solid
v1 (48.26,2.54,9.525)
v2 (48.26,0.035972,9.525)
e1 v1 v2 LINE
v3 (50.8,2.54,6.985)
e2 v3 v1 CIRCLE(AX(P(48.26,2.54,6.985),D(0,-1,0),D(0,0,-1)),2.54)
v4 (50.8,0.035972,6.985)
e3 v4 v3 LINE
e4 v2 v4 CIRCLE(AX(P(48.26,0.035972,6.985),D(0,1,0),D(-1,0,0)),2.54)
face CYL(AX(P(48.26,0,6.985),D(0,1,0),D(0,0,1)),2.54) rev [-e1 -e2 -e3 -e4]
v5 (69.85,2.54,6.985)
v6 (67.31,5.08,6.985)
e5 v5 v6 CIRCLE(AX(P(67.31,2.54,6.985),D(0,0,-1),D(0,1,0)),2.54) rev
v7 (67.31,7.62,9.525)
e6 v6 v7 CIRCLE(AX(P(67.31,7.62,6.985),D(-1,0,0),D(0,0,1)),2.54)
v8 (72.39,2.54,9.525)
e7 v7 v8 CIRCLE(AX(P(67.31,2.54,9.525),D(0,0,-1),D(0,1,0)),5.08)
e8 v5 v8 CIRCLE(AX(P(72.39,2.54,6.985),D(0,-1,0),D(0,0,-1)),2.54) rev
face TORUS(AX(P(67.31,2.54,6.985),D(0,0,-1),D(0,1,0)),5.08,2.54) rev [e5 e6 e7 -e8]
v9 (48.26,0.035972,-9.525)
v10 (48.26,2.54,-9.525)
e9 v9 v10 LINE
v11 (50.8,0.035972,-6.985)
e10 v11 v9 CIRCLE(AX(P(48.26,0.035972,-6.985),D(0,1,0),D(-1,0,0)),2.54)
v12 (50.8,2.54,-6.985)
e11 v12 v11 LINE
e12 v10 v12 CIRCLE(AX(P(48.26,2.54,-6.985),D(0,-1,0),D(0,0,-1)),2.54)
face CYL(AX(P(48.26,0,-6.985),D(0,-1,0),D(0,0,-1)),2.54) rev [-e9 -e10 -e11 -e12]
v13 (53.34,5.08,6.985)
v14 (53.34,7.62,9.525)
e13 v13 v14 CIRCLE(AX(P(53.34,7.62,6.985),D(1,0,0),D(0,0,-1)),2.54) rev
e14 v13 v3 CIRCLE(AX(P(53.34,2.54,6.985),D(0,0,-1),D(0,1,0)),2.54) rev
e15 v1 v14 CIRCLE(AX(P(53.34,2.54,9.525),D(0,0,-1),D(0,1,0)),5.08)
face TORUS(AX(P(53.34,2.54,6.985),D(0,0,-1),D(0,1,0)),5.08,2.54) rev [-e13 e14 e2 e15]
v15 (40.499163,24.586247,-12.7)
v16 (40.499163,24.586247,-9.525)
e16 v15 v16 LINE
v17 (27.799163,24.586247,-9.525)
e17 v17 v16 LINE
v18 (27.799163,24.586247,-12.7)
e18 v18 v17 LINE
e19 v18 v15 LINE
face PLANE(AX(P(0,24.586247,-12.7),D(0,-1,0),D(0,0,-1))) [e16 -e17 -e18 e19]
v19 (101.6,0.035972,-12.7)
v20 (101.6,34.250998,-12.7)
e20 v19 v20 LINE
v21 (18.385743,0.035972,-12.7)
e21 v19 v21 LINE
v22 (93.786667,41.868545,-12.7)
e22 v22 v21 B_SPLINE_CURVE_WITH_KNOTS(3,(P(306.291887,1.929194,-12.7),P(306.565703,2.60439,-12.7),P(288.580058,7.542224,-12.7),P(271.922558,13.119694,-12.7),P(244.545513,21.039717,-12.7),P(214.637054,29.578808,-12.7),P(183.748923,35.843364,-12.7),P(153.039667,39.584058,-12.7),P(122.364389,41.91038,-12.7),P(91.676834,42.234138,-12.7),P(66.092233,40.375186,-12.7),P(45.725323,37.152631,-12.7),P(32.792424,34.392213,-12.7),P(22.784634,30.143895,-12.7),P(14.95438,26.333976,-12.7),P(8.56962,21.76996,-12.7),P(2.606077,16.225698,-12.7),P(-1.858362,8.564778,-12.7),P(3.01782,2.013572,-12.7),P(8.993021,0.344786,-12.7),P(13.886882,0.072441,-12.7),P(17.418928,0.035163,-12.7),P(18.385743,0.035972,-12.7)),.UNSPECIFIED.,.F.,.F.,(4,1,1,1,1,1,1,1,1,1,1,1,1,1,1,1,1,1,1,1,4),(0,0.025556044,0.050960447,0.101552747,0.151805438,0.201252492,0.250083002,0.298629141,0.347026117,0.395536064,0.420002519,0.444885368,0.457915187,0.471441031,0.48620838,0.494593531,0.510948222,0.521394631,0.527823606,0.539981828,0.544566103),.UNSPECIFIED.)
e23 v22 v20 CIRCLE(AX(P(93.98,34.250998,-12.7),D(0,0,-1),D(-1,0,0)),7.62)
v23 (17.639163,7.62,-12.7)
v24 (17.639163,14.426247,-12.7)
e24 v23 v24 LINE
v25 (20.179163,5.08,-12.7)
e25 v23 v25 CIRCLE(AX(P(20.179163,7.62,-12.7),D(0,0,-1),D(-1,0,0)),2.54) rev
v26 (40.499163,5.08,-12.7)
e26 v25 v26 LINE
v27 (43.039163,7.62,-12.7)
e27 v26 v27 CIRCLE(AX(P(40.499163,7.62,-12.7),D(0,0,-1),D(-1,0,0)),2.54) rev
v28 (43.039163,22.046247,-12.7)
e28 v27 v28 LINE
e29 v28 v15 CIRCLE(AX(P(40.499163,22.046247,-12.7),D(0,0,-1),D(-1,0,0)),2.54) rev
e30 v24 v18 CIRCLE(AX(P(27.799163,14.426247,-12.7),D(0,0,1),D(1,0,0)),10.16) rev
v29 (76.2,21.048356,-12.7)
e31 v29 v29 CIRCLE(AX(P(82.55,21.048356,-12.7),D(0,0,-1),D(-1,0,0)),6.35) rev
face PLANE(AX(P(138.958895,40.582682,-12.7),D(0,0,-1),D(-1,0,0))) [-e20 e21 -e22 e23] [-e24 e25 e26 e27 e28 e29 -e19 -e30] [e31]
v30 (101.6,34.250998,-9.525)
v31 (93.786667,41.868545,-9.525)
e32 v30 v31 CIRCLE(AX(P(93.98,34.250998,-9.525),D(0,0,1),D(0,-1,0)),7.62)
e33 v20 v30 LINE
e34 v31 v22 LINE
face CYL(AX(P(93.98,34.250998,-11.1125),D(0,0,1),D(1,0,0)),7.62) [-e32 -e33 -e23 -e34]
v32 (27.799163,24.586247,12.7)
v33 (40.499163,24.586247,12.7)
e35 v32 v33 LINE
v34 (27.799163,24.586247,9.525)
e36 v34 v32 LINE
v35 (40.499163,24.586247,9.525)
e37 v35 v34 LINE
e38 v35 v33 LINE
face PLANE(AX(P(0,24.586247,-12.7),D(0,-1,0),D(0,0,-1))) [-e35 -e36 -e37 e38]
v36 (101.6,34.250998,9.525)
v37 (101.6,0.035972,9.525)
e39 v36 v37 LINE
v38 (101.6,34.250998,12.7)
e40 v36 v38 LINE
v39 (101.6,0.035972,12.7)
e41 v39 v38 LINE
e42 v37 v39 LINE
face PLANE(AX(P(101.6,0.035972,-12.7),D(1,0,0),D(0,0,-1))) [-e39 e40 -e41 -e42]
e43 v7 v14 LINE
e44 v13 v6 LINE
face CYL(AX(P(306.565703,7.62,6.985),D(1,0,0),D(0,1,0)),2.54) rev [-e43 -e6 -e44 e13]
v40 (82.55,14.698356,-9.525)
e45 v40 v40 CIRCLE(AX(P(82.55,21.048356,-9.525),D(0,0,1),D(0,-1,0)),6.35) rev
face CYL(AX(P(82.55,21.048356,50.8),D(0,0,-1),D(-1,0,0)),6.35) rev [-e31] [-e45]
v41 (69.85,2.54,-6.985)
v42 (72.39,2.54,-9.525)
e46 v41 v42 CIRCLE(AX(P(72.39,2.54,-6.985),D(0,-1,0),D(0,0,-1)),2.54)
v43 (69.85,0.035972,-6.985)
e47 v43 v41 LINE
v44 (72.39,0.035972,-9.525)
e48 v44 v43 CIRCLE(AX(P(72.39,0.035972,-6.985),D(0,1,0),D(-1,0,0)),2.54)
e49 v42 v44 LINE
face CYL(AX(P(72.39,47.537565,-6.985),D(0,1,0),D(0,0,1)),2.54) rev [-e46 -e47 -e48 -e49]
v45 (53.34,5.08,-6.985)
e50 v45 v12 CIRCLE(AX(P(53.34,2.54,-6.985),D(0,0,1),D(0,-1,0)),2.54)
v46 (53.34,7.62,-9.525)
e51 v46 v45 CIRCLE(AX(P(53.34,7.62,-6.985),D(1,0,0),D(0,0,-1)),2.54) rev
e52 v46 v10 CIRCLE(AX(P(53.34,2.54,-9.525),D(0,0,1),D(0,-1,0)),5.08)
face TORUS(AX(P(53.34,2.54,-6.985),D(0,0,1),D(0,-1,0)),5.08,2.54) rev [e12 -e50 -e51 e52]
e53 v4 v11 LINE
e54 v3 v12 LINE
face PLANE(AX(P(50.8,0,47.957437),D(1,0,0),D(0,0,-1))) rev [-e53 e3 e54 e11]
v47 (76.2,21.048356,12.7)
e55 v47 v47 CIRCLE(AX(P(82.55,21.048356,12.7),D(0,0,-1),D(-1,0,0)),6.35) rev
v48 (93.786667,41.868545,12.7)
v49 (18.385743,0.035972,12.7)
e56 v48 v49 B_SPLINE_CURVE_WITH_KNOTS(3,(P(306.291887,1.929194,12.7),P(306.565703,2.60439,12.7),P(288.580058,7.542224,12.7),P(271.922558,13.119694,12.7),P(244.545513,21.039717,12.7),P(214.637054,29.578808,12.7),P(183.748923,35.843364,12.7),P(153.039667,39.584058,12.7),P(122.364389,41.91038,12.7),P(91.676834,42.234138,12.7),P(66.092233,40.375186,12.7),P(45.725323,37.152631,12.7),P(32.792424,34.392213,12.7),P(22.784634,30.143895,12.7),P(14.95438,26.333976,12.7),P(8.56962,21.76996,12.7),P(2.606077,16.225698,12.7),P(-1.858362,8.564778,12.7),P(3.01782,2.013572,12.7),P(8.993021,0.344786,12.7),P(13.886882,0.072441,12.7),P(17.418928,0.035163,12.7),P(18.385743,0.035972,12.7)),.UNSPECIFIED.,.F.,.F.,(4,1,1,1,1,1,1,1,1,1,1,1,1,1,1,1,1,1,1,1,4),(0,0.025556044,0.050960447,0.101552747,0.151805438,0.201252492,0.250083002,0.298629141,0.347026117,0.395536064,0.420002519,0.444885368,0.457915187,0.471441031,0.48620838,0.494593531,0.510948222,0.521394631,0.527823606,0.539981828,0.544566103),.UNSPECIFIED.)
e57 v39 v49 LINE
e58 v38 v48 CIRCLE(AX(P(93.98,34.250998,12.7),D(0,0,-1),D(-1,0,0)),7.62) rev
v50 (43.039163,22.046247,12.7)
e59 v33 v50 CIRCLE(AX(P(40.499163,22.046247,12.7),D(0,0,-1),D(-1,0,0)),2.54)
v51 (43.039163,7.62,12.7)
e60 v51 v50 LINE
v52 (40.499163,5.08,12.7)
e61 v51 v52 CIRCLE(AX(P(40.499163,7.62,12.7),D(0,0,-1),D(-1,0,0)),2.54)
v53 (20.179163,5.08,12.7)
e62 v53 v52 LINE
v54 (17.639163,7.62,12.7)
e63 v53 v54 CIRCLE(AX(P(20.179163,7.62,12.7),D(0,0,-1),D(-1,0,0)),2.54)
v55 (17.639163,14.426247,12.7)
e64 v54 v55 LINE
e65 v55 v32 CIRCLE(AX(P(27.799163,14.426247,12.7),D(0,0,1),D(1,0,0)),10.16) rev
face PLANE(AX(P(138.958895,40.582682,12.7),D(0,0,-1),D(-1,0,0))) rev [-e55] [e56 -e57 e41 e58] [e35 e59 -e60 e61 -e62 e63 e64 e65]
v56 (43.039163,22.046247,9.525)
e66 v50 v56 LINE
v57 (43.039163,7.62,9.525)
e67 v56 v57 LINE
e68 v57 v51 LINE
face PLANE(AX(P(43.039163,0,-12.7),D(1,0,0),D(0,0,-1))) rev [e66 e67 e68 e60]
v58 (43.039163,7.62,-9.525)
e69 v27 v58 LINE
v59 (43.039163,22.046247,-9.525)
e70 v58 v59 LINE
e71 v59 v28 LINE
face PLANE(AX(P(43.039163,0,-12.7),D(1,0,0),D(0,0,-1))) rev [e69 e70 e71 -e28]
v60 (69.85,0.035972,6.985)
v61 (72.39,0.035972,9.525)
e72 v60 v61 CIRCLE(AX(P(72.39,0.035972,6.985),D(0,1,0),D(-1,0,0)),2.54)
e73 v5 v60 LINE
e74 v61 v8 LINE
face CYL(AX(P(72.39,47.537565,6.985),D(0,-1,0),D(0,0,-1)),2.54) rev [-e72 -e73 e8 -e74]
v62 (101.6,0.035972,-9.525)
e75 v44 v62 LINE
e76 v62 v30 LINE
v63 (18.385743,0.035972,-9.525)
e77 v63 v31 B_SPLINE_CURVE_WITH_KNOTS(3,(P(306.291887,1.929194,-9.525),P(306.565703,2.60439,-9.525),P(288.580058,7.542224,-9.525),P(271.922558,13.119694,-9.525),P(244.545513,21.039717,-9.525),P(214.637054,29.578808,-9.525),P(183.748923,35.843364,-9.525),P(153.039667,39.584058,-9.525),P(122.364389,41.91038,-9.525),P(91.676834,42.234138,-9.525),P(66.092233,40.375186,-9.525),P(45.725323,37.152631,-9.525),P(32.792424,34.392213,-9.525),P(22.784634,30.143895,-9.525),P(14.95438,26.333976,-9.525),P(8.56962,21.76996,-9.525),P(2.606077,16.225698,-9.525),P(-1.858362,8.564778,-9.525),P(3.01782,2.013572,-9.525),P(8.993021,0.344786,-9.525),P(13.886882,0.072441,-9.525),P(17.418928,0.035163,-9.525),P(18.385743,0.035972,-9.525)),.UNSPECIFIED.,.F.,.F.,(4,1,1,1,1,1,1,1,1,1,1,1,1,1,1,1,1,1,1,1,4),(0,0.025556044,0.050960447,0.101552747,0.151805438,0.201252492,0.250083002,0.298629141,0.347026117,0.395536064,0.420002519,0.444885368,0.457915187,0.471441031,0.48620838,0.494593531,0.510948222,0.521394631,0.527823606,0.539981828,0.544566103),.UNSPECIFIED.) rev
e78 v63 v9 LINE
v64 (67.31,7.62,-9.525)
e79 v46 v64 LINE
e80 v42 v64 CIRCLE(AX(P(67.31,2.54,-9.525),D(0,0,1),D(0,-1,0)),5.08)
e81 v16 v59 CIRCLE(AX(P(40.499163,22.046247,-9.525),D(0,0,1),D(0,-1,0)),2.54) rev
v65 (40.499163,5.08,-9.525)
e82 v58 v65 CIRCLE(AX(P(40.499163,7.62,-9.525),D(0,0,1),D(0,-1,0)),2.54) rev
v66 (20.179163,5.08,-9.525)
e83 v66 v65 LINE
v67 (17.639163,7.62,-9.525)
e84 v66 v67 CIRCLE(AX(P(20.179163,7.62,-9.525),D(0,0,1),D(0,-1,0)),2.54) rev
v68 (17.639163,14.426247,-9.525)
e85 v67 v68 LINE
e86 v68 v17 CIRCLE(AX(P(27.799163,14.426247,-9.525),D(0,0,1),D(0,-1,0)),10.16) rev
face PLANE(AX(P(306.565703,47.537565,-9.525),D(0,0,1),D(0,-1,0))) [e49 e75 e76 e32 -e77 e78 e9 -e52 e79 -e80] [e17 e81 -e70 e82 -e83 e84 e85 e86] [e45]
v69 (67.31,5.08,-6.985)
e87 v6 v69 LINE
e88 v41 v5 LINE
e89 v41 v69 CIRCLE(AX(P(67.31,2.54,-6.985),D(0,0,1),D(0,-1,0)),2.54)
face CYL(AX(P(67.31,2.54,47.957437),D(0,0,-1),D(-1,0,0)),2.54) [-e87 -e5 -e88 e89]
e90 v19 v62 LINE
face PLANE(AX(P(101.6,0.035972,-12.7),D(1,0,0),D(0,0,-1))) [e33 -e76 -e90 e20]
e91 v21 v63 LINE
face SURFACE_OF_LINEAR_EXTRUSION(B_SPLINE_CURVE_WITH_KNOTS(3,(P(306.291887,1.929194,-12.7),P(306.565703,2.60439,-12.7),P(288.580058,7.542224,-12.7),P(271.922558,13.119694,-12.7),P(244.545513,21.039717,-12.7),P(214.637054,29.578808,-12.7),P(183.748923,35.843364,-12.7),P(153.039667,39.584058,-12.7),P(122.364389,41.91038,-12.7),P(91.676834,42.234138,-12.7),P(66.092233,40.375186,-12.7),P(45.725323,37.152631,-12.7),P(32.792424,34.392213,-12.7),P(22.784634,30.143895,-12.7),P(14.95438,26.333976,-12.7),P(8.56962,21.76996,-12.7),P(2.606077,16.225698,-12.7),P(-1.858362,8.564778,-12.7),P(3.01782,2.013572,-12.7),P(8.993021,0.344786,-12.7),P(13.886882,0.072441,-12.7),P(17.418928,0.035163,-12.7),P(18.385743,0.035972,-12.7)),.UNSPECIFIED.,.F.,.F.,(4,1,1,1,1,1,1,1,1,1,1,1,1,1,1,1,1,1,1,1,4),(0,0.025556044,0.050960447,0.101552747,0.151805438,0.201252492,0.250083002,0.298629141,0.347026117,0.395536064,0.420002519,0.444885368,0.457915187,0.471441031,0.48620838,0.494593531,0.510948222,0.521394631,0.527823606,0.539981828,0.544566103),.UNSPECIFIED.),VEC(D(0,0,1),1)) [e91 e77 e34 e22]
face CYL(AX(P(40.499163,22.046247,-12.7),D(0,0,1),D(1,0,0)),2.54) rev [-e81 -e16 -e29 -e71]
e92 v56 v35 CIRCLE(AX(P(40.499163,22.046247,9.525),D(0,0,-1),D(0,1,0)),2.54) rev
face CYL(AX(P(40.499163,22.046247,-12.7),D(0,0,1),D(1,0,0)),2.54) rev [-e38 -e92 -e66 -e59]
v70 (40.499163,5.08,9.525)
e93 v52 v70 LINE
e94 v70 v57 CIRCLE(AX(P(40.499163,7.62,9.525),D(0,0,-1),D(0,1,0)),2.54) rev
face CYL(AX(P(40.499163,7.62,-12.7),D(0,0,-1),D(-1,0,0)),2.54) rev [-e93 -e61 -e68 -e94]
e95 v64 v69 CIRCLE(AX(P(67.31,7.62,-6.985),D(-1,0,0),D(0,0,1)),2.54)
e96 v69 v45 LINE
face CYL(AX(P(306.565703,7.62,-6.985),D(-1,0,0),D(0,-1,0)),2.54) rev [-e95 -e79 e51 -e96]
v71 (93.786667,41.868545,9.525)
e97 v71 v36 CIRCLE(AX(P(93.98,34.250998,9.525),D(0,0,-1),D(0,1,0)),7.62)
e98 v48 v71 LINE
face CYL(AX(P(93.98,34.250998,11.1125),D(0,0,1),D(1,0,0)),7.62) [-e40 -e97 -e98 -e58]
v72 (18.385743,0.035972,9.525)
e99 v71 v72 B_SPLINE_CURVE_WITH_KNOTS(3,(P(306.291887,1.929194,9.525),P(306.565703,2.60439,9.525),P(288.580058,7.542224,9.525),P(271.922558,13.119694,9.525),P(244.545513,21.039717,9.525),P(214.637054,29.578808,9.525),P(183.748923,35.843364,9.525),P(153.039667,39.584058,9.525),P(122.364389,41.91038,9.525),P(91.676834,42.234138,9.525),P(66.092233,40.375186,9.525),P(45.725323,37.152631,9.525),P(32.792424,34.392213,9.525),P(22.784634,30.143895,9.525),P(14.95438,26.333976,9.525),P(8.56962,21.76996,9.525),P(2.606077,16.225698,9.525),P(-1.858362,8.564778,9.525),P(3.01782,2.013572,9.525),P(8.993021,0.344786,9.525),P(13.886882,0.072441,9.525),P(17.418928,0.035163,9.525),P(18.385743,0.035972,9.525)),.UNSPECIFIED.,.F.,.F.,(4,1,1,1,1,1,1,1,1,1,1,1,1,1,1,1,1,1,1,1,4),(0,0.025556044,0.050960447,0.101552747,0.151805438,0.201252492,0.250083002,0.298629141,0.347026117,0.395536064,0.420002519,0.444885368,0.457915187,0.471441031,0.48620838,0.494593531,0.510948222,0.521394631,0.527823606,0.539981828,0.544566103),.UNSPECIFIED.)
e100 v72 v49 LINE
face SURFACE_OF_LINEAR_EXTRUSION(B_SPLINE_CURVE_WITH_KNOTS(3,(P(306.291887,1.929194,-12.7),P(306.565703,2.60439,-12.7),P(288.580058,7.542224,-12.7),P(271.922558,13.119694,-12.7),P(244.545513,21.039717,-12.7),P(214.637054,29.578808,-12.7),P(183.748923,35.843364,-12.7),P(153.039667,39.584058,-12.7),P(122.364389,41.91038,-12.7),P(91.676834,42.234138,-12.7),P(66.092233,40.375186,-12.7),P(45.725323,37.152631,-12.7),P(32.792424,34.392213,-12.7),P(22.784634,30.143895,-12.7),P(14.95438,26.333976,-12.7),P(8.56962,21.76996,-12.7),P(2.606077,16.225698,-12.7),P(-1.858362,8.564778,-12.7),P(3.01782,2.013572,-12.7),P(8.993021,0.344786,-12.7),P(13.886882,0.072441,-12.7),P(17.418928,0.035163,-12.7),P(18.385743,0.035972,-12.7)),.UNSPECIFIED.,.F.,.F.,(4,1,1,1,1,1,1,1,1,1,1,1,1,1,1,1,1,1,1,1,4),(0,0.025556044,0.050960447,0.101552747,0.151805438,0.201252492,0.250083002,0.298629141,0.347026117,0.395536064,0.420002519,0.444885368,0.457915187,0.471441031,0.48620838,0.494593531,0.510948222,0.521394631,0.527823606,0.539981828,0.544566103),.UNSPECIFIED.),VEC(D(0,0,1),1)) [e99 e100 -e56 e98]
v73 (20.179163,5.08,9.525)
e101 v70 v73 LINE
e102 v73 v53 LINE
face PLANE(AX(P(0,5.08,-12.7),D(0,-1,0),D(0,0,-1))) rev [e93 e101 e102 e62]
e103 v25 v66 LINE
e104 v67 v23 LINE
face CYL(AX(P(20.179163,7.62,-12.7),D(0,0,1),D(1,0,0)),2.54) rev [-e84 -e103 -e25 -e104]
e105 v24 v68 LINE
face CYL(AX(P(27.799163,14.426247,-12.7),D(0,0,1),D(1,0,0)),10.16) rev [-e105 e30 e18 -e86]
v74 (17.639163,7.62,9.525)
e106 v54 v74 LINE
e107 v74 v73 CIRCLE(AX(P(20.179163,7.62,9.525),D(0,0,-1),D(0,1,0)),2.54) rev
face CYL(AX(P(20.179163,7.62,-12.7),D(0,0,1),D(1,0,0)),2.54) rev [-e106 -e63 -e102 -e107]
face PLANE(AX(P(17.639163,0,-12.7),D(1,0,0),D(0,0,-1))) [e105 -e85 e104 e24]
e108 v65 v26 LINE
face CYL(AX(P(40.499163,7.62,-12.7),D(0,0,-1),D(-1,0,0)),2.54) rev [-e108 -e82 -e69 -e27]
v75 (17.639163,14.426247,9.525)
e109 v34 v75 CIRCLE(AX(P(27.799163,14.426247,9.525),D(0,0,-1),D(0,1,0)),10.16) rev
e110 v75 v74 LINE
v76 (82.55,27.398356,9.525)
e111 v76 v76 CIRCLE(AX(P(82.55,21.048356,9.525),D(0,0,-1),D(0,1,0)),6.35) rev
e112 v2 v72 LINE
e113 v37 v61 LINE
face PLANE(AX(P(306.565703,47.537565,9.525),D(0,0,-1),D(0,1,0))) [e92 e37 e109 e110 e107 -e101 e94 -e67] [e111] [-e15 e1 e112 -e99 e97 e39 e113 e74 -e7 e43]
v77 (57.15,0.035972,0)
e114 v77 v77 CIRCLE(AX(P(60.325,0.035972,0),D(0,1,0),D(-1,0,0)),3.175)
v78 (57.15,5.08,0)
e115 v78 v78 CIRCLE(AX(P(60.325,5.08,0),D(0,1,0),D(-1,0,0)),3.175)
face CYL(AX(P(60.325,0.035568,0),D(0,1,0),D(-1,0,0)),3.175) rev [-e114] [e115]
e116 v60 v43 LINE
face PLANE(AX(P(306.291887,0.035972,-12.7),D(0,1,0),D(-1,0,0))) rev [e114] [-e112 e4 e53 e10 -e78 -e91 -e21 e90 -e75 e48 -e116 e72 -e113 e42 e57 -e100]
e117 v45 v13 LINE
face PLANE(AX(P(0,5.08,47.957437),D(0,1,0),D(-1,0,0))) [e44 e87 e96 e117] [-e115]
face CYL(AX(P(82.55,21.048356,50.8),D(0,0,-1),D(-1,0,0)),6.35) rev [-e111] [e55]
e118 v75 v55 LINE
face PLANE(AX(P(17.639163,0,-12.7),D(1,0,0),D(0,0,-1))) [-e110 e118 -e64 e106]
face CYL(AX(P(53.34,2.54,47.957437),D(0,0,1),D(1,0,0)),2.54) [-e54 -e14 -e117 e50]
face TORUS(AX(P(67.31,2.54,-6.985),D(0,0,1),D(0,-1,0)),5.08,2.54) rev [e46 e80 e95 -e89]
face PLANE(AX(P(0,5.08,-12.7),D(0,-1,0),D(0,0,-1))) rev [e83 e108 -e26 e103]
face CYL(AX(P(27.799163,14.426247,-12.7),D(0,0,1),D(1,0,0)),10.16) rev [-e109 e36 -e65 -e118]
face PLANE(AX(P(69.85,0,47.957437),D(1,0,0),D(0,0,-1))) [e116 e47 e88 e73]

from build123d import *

# Parameters (mm, degrees)
BOSS_EXTRUDE1_DEPTH      = 12.7
BOSS_EXTRUDE1_DEPTH_BACK = 12.7
SKETCH2_W                = 19.05
SKETCH2_H                = 49.651656102
CUT_EXTRUDE1_DEPTH       = 310.423757716
SKETCH3_W                = 38.1
SKETCH3_H                = 5.044027725
SKETCH3_W_2              = 19.05
BOSS_EXTRUDE2_DEPTH      = 19.05
CUT_EXTRUDE3_DEPTH       = 50.8
CUT_EXTRUDE3_DEPTH_BACK  = 50.8
SKETCH12_R               = 6.35
SKETCH12_R_2             = 3.175
SKETCH12_R_3             = 5
FILLET8_R                = 2.54
SKETCH13_W               = 213.045597148
SKETCH13_H               = 55.670329679
CUT_EXTRUDE4_DEPTH       = 311.204708703
FILLET9_START            = 9
FILLET9_DEPTH            = 5
FILLET10_START           = -14
FILLET10_DEPTH           = 5
CUT_EXTRUDE5_DEPTH       = 113.114633783
CUT_EXTRUDE5_DEPTH_BACK  = 113.114633783
FILLET11_R               = 2.54
SKETCH8_R                = 3.175
CUT_EXTRUDE2_DEPTH       = 109.799942755


with BuildPart() as part:
    # Sketch1 → Boss-Extrude1 (new, two sides: drawn at the far end of the back side and taken through both)
    with BuildSketch(Plane.XY.offset(-BOSS_EXTRUDE1_DEPTH_BACK)):
        with BuildLine():
            Line((306.2918866, 1.929193729), (306.2918866, 0.035972275))
            Line((306.2918866, 0.035972275), (18.385743088, 0.035972275))
            add(Edge.make_bspline(
                [(306.2918866, 1.929193729), (306.565703117, 2.60439044), (288.5800577, 7.542224382), (271.922557924, 13.119693618), (244.545512993, 21.039717296), (214.63705438, 29.578808281), (183.74892315, 35.843363942), (153.039666672, 39.584058053), (122.364389131, 41.910380286), (91.676834287, 42.234137684), (66.092232531, 40.375185886), (45.725322729, 37.15263137), (32.792424184, 34.392213233), (22.784634494, 30.143895353), (14.954380304, 26.333975955), (8.569620221, 21.769960087), (2.606076707, 16.225698301), (-1.858362456, 8.564778309), (3.017819974, 2.013571533), (8.993020993, 0.344786487), (13.886881629, 0.072440703), (17.418928388, 0.035163036), (18.385743088, 0.035972275)],
                knots=[0, 0, 0, 0, 0.025556044, 0.050960447, 0.101552747, 0.151805438, 0.201252492, 0.250083002, 0.298629141, 0.347026117, 0.395536064, 0.420002519, 0.444885368, 0.457915187, 0.471441031, 0.48620838, 0.494593531, 0.510948222, 0.521394631, 0.527823606, 0.539981828, 0.544566103, 0.544566103, 0.544566103, 0.544566103], degree=3))
        make_face()
    extrude(amount=BOSS_EXTRUDE1_DEPTH + BOSS_EXTRUDE1_DEPTH_BACK)

    # Sketch2 → Cut-Extrude1 (cut, through all)
    with BuildSketch(Plane(origin=(0, 0, 0), x_dir=(0, 0, -1), z_dir=(1, 0, 0))):
        with Locations((0, 22.711736939)):
            Rectangle(SKETCH2_W, SKETCH2_H)
    extrude(amount=CUT_EXTRUDE1_DEPTH, mode=Mode.SUBTRACT)


with BuildPart() as cut_extrude1_piece_1:
    # of the separate pieces the step leaves, piece 1, a body of its own (cut_extrude1_pieces)
    add(part.part.solids().sort_by_distance((306.2918866, 0.035972275, 9.525))[0])



with BuildPart() as cut_extrude1_piece_2:
    # of the separate pieces the step leaves, piece 2, a body of its own (cut_extrude1_pieces)
    add(part.part.solids().sort_by_distance((306.2918866, 1.929193729, -9.525))[0])


with BuildPart() as cut_extrude1_piece_1_1:
    add(cut_extrude1_piece_1.part)

    add(cut_extrude1_piece_2.part)  # Boss-Extrude2 merges Cut-Extrude1 piece 2
    # Sketch3 → Boss-Extrude2 (add)
    with BuildSketch(Plane.XY.offset(-9.525)):
        with Locations((190.372920526, 2.557986137)):
            Rectangle(SKETCH3_W, SKETCH3_H)
        with Locations((60.325, 2.557986137)):
            Rectangle(SKETCH3_W_2, SKETCH3_H)
    extrude(amount=BOSS_EXTRUDE2_DEPTH)

    # Sketch12 → Cut-Extrude3 (cut, two sides: drawn at the far end of the back side and taken through both)
    with BuildSketch(Plane.XY.offset(-CUT_EXTRUDE3_DEPTH_BACK)):
        with Locations(Location((82.55, 21.048356458, 0), (0, 0, 180))):
            Circle(SKETCH12_R)
        with Locations(Location((152.4, 21.048356458, 0), (0, 0, 180))):
            Circle(SKETCH12_R_2)
        with Locations(Location((228.6, 13.349794258, 0), (0, 0, 180))):
            Circle(SKETCH12_R_2)
        with Locations(Location((117.475, 21.048356458, 0), (0, 0, 180))):
            Circle(SKETCH12_R_3)
    extrude(amount=CUT_EXTRUDE3_DEPTH + CUT_EXTRUDE3_DEPTH_BACK, mode=Mode.SUBTRACT)

    # Fillet8
    fillet8_edges = [cut_extrude1_piece_1_1.edges().sort_by_distance(p)[0] for p in [
        (60.325, 5.08, -9.525),
        (69.85, 2.557986137, -9.525),
        (60.325, 5.08, 9.525),
        (69.85, 2.557986137, 9.525),
        (171.322920526, 2.557986137, -9.525),
        (171.322920526, 5.08, 0),
        (190.372920526, 5.08, 9.525),
        (209.422920526, 5.08, 0),
        (190.372920526, 5.08, -9.525),
        (209.422920526, 2.557986137, 9.525),
        (209.422920526, 2.557986137, -9.525),
        (171.322920526, 2.557986137, 9.525),
        (69.85, 5.08, 0),
        (50.8, 2.557986137, 9.525),
        (50.8, 5.08, 0),
        (50.8, 2.557986137, -9.525),
    ]]
    fillet(fillet8_edges, radius=FILLET8_R)

    # Sketch13 → Cut-Extrude4 (cut, through all)
    with BuildSketch(Plane.XY.offset(12.7)):
        with Locations((208.122798574, 27.871137115)):
            Rectangle(SKETCH13_W, SKETCH13_H)
    extrude(amount=-CUT_EXTRUDE4_DEPTH, mode=Mode.SUBTRACT)

    # Fillet9: read off the stored shape, not the designer's step
    # Fillet9 outline → Fillet9 (cut)
    with BuildSketch(Plane.XY.offset(FILLET9_START)):
        with BuildLine():
            ThreePointArc((93.786667063, 41.868544727), (99.299361006, 39.707076762), (101.6, 34.250997722))
            Line((101.6, 34.250997722), (101.6, 41.986781628))
            add(Edge.make_bspline(
                [(101.6, 41.986781628), (98.995537309, 41.973544215), (96.390994688, 41.934642423), (93.786667063, 41.868544727)],
                knots=[0.331387316, 0.331387316, 0.331387316, 0.331387316, 0.343736136, 0.343736136, 0.343736136, 0.343736136], degree=3))
        make_face()
    extrude(amount=FILLET9_DEPTH, mode=Mode.SUBTRACT)

    # Fillet10: read off the stored shape, not the designer's step
    # Fillet10 outline → Fillet10 (cut)
    with BuildSketch(Plane.XY.offset(FILLET10_START)):
        with BuildLine():
            ThreePointArc((93.786667063, 41.868544727), (99.299361006, 39.707076762), (101.6, 34.250997722))
            Line((101.6, 34.250997722), (101.6, 41.986781628))
            add(Edge.make_bspline(
                [(101.6, 41.986781628), (98.995537309, 41.973544215), (96.390994688, 41.934642423), (93.786667063, 41.868544727)],
                knots=[0.331387316, 0.331387316, 0.331387316, 0.331387316, 0.343736136, 0.343736136, 0.343736136, 0.343736136], degree=3))
        make_face()
    extrude(amount=FILLET10_DEPTH, mode=Mode.SUBTRACT)

    # Sketch3<7> → Cut-Extrude5 (cut, two sides: drawn at the far end of the back side and taken through both)
    with BuildSketch(Plane.XY.offset(-9.525).offset(-CUT_EXTRUDE5_DEPTH_BACK)):
        with BuildLine():
            ThreePointArc((17.639162626, 14.426247308), (20.614957729, 21.610452205), (27.799162626, 24.586247308))
            Line((27.799162626, 24.586247308), (43.039162626, 24.586247308))
            Line((43.039162626, 24.586247308), (43.039162626, 5.08))
            Line((43.039162626, 5.08), (17.639162626, 5.08))
            Line((17.639162626, 5.08), (17.639162626, 14.426247308))
        make_face()
    extrude(amount=CUT_EXTRUDE5_DEPTH + CUT_EXTRUDE5_DEPTH_BACK, mode=Mode.SUBTRACT)

    # Fillet11
    fillet11_edges = [cut_extrude1_piece_1_1.edges().sort_by_distance(p)[0] for p in [
        (43.039162626, 24.586247308, -11.1125),
        (43.039162626, 5.08, -11.1125),
        (17.639162626, 5.08, -11.1125),
        (43.039162626, 24.586247308, 11.1125),
        (43.039162626, 5.08, 11.1125),
        (17.639162626, 5.08, 11.1125),
    ]]
    fillet(fillet11_edges, radius=FILLET11_R)

    # Sketch8 → Cut-Extrude2 (cut, through all)
    with BuildSketch(Plane(origin=(0, 5.08, 0), x_dir=(-1, 0, 0), z_dir=(0, 1, 0))):
        with Locations((-60.325, 0)):
            Circle(SKETCH8_R)
    extrude(amount=-CUT_EXTRUDE2_DEPTH, mode=Mode.SUBTRACT)


solid = cut_extrude1_piece_1_1.part
